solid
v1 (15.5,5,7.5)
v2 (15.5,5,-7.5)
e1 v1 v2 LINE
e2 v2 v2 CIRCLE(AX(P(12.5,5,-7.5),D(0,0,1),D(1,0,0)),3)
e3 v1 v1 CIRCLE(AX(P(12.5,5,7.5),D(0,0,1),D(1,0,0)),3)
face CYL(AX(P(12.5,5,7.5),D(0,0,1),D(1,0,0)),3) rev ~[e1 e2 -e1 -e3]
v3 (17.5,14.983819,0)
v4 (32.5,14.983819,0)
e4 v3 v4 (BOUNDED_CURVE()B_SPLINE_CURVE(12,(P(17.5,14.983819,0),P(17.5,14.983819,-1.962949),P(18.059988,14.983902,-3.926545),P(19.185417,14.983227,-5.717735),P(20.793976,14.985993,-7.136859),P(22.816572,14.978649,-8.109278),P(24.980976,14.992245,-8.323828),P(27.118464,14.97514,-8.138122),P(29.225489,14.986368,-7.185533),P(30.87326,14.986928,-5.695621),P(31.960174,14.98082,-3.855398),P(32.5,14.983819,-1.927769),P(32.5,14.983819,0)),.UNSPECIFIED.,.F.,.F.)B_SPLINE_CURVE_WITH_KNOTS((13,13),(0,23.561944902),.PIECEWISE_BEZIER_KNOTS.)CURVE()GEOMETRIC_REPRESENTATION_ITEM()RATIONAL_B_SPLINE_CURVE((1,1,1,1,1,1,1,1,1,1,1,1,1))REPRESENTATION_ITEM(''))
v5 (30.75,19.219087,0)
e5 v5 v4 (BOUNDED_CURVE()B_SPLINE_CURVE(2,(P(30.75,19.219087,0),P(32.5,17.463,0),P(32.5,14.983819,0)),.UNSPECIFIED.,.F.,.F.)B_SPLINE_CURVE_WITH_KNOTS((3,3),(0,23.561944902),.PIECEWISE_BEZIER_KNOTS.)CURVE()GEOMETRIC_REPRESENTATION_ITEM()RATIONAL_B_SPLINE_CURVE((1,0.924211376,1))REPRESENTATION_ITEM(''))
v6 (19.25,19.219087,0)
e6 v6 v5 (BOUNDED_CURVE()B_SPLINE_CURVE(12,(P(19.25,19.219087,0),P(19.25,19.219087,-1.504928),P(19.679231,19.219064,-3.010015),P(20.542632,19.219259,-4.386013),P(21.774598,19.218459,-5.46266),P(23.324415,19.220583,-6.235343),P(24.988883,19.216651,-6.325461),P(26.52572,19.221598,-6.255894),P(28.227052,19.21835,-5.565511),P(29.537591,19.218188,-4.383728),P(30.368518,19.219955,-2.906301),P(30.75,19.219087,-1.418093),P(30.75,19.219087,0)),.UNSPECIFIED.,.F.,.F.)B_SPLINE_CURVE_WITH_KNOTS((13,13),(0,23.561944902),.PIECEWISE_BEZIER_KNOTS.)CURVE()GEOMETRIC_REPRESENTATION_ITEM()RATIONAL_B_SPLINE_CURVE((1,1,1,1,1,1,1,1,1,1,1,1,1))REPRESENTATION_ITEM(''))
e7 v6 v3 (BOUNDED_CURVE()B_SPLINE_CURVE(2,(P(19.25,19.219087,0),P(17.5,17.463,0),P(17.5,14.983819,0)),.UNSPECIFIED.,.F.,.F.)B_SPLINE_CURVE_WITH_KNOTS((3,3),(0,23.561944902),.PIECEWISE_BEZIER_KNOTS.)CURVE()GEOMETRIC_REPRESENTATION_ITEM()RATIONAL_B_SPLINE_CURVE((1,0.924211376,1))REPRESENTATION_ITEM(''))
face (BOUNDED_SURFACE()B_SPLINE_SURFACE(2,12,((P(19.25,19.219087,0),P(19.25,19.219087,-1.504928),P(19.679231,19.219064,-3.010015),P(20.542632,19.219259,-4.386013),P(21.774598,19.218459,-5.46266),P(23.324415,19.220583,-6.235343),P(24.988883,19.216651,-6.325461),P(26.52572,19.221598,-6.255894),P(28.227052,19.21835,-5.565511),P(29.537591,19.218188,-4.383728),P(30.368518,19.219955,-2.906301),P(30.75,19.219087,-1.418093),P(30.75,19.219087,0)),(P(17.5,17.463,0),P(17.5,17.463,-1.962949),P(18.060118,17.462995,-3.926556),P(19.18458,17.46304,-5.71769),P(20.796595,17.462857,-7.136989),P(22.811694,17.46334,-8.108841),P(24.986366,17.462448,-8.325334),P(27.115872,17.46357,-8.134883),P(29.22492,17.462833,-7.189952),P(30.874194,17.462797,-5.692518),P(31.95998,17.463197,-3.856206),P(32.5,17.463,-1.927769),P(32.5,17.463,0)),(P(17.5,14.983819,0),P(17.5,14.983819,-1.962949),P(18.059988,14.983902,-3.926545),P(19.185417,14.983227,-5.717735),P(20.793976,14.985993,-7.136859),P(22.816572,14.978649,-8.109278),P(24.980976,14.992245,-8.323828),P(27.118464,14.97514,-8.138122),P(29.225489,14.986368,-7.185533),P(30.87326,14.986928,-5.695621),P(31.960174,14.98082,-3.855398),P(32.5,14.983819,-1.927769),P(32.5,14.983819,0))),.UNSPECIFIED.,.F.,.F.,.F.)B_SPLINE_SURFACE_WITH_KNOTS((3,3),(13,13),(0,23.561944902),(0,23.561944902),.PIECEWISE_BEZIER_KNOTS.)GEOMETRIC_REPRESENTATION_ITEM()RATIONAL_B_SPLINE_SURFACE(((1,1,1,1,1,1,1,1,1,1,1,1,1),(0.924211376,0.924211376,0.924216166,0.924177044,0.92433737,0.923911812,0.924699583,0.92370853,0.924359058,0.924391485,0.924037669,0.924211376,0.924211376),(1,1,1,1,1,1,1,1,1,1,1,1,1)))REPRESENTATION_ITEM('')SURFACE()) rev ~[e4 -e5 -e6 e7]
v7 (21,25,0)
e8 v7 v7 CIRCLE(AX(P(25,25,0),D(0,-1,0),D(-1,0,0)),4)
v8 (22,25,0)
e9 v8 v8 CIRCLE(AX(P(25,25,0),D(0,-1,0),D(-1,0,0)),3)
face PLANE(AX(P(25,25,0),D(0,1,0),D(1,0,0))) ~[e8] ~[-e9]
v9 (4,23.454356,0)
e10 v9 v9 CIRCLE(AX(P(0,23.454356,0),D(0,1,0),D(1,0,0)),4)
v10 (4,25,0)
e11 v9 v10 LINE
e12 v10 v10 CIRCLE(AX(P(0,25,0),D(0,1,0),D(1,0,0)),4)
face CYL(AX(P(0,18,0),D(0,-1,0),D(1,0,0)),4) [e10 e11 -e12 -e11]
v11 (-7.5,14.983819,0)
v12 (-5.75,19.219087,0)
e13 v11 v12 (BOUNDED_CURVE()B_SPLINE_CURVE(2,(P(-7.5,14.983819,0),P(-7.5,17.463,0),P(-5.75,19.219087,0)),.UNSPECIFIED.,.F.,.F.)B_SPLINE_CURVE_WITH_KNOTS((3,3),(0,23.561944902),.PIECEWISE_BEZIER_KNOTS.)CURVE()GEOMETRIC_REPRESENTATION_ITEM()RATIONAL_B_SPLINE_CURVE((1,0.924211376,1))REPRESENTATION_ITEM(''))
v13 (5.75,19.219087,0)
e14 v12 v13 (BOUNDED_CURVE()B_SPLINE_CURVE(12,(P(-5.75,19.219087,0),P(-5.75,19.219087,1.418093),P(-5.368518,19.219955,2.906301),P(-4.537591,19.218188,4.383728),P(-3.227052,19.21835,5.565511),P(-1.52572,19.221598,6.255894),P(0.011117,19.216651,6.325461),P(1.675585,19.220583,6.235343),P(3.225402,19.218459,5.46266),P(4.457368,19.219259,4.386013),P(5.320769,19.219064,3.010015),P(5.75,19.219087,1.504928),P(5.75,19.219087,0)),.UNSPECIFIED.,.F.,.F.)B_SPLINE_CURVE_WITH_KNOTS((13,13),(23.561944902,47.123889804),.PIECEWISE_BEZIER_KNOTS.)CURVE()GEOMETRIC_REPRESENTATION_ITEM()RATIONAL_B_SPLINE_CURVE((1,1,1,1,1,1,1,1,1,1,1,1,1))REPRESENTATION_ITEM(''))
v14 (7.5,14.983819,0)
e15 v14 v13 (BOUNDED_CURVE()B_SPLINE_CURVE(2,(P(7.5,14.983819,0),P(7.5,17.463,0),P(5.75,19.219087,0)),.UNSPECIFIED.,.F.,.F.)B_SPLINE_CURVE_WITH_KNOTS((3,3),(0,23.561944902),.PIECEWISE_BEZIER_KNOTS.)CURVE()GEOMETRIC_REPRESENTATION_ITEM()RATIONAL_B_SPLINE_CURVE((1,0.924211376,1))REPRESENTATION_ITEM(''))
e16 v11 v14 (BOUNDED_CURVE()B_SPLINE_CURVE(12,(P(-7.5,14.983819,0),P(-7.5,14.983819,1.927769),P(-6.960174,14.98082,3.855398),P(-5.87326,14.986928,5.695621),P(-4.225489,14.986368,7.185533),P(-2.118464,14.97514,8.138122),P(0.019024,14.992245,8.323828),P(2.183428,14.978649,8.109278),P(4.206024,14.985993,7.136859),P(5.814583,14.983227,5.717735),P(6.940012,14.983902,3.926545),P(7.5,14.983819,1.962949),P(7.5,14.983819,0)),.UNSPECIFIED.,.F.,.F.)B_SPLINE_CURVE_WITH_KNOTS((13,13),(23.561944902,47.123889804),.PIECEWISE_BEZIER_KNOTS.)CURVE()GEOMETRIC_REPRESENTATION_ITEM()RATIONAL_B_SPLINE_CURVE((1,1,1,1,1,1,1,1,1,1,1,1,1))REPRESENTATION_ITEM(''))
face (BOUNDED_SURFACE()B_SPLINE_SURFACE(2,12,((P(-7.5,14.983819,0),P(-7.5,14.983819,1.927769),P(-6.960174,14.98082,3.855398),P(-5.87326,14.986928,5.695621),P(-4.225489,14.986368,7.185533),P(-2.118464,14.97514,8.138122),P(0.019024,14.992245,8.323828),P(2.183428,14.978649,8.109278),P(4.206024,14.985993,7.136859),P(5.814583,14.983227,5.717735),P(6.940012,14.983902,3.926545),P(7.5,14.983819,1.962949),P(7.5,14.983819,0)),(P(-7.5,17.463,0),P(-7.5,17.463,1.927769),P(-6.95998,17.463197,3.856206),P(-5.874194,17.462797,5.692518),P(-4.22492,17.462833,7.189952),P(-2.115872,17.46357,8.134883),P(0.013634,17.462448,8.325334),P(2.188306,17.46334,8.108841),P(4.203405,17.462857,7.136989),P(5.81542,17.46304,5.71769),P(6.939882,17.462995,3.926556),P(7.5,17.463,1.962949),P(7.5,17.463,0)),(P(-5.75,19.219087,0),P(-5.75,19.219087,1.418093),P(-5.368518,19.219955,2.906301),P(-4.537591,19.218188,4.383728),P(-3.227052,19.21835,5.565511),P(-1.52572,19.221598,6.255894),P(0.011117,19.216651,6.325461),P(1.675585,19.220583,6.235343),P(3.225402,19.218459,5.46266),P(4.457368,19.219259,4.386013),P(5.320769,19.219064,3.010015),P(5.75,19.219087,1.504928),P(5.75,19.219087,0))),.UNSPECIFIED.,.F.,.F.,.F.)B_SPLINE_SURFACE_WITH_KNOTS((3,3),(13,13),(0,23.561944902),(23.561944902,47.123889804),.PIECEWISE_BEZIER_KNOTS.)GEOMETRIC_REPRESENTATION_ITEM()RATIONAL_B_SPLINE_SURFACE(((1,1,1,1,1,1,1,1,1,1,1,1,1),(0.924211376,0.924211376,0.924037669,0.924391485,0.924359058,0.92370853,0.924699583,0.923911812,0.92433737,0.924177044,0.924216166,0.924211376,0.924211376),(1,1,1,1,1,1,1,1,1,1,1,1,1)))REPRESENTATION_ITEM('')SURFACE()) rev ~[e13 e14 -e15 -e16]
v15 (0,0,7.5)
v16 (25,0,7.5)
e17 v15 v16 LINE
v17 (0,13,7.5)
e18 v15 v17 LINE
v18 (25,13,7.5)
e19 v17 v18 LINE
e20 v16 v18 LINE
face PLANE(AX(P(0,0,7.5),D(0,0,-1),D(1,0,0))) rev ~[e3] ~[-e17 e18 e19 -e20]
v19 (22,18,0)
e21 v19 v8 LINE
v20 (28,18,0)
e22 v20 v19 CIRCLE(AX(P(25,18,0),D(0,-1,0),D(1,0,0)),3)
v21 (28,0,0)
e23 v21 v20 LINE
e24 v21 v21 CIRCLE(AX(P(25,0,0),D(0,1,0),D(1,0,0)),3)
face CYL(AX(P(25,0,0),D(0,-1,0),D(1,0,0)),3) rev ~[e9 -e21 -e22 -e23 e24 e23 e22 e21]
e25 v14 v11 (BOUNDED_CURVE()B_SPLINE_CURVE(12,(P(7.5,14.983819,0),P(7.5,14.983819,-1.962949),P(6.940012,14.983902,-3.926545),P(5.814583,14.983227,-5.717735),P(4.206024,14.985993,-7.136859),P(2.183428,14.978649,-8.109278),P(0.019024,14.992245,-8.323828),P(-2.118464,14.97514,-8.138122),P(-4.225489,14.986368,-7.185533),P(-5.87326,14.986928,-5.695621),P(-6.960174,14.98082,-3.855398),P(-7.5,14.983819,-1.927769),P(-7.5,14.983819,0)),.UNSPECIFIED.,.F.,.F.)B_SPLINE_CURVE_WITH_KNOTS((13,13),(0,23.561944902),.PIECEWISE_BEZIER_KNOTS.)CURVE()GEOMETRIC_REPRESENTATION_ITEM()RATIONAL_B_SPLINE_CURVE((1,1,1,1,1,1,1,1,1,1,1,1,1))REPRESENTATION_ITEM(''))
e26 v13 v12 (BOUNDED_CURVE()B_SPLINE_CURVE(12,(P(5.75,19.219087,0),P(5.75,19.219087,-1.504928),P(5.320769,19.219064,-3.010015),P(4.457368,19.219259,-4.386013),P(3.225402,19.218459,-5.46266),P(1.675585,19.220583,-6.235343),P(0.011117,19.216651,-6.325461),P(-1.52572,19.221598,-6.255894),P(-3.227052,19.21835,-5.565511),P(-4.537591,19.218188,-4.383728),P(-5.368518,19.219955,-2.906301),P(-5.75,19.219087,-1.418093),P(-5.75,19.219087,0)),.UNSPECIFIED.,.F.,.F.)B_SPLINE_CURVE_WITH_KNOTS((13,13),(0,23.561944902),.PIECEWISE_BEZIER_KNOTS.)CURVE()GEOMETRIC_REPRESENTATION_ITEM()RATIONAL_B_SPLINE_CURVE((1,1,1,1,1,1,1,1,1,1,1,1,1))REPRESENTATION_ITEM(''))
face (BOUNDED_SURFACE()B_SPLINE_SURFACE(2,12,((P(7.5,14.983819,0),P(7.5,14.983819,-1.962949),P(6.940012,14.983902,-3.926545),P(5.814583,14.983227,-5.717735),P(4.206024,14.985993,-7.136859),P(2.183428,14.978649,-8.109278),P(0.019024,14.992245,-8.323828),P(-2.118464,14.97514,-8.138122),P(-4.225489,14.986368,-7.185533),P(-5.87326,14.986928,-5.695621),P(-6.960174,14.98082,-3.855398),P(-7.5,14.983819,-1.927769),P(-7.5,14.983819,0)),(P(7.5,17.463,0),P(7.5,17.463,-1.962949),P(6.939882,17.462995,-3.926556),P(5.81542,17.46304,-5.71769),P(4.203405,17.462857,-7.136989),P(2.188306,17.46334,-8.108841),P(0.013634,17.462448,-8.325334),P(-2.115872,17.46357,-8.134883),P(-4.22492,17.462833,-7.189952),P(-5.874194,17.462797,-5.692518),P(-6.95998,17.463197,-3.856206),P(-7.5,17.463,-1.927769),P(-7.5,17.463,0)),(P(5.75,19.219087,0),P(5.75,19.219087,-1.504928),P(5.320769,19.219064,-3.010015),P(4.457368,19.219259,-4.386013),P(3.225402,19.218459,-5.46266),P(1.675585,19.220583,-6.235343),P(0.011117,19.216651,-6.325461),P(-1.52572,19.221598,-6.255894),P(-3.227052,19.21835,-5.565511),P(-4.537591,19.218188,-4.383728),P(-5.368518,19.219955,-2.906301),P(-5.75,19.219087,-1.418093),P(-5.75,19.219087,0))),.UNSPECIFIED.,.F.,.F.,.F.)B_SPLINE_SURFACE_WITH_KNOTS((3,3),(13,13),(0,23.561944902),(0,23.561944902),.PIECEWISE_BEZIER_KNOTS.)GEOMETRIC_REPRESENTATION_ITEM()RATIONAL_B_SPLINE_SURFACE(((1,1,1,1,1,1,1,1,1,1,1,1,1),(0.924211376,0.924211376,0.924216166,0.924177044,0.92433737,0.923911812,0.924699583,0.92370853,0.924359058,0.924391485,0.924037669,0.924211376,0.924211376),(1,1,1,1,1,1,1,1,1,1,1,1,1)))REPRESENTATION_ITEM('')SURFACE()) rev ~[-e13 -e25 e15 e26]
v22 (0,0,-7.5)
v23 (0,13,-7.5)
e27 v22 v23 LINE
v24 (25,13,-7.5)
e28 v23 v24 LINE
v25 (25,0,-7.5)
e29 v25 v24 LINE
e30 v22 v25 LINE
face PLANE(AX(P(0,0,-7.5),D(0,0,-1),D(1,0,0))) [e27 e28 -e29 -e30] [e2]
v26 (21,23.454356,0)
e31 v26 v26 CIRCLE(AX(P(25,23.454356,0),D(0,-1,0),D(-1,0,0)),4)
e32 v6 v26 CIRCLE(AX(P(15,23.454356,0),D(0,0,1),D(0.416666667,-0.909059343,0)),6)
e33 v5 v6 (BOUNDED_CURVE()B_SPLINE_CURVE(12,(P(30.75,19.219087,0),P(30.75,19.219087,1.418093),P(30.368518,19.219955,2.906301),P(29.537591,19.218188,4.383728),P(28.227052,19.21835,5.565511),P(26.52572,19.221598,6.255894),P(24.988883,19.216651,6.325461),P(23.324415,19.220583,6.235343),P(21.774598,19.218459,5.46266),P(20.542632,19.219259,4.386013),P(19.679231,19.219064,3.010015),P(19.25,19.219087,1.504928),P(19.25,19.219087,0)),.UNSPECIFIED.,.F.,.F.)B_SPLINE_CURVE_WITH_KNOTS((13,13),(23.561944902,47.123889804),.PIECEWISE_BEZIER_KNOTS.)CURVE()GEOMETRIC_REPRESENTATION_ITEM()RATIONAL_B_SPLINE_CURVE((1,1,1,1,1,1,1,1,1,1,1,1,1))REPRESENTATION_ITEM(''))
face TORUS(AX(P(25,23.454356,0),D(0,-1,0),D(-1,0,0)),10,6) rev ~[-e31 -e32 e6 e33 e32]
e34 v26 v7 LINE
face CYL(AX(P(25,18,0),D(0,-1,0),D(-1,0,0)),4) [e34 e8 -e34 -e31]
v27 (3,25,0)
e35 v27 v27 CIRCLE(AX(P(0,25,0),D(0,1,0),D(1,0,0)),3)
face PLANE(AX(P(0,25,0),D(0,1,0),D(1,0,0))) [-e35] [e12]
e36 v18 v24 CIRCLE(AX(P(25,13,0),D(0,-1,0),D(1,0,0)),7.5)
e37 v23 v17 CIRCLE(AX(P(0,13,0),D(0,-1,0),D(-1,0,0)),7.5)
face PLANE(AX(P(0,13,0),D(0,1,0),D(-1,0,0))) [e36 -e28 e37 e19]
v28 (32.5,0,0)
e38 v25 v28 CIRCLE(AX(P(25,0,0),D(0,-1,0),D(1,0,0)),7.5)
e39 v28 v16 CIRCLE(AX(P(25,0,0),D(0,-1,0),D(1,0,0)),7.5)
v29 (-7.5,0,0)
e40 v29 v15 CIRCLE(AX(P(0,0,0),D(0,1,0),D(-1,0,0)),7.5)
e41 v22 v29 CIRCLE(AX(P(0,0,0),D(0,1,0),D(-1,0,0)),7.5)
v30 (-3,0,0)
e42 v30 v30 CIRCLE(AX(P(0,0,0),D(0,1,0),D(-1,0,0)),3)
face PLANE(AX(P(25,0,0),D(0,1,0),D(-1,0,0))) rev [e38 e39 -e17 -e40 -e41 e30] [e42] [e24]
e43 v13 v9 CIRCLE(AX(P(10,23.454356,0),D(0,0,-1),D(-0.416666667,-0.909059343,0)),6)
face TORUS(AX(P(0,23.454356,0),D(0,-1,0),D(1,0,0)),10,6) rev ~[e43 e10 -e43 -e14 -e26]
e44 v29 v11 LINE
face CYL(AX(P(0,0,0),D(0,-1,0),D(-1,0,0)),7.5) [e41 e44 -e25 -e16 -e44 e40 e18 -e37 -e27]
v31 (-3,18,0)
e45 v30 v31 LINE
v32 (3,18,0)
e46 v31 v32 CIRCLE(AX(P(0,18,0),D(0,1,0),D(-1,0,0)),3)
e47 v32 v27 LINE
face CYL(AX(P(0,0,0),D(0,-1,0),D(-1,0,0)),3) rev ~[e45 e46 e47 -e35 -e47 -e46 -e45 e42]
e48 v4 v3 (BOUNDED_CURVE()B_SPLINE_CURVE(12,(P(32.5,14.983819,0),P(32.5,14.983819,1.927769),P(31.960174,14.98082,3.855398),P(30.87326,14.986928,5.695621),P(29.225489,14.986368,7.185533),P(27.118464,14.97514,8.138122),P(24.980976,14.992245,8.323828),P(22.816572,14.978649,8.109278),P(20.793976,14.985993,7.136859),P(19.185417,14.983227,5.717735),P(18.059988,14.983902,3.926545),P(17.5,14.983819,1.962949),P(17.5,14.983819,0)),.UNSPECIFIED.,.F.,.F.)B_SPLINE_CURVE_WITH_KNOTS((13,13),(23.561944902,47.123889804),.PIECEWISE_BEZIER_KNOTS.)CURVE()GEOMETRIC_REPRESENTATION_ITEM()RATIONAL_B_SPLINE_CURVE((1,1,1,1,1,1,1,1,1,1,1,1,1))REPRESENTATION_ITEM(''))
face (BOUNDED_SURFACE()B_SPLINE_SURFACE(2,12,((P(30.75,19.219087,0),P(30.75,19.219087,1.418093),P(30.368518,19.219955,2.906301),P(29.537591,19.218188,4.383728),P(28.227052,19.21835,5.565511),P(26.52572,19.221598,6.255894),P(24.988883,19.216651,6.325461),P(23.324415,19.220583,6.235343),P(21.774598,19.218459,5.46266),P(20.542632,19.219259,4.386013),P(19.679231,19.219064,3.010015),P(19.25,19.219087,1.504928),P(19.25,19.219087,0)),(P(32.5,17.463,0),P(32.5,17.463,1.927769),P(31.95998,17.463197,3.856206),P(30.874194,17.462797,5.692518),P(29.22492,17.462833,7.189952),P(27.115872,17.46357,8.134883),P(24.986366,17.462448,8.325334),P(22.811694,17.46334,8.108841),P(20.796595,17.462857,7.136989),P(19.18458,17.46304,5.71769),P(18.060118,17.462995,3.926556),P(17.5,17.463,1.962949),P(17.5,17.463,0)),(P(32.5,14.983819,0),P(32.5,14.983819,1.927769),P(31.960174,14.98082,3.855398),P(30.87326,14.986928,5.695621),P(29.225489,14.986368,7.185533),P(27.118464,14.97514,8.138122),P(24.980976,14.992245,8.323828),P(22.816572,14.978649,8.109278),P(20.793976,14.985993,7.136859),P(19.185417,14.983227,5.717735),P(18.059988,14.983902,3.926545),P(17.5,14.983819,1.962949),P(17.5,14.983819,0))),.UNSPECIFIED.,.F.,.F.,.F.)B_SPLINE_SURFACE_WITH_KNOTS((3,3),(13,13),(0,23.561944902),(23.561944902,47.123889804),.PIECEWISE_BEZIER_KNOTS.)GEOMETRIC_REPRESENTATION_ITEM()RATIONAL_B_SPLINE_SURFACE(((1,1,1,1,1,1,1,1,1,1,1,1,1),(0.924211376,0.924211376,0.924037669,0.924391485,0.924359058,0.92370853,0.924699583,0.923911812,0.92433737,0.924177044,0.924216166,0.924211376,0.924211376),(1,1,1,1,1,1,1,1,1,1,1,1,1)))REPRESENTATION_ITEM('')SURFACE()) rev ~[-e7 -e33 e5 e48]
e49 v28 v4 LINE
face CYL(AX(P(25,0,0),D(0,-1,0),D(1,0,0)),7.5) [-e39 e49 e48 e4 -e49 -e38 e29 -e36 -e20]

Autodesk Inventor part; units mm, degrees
ref_plane "XZ Plane" through (0, 0, 0) normal (0, 1, 0) x (-1, 0, 0)
ref_plane "XY Plane" through (0, 0, 0) normal (0, 0, 1) x (1, 0, 0)
sketch "Sketch1" plane through (0, 0, 0) normal (0, 1, 0) x (-1, 0, 0)
  circle A0 centre (0, 0) radius 7.5
  circle A1 centre (0, 0) radius 3
  dimension "d0" = 15
  dimension "d1" = 6
extrude "Extrusion1" add sketch "Sketch1" along normal blind 18
sketch "Sketch2" plane through (0, 18, 0) normal (0, 1, 0) x (1, 0, 0)
  circle A0 centre (0, 0) radius 3 projected
  circle A1 centre (0, 0) radius 2.75
  circle A2 centre (0, 0) radius 4
  dimension "d4" = 5.5
  dimension "d5" = 8
extrude "Extrusion2" add sketch "Sketch2" along normal blind 7 contours A2
fillet "Fillet1" radius 6 1 edges at (-4, 18, 0)
fillet "Fillet2" radius 6 2 edges at (0, 18, -7.5) (0, 18, 7.5)
ref_plane "Work Plane1" through (12.5, 0, 0) normal (1, 0, 0) x (0, 1, 0)
mirror "Mirror1" about plane through (12.5, 0, 0) normal (1, 0, 0) of "Extrusion1", "Extrusion2", "Fillet1", "Fillet2"
sketch "Sketch3" plane through (0, 0, 0) normal (0, 1, 0) x (-1, 0, 0)
  circle A0 centre (-25, 0) radius 3 projected
  line L0 (-25, 0) -> (-25, 3)
  line L1 (-25, 0) -> (-25, -3)
  line L2 (0, 0) -> (0, -3)
  circle A1 centre (0, 0) radius 3 projected
  line L3 (0, 0) -> (0, 3)
  line L4 (-25, 3) -> (0, 3)
  line L5 (0, 3) -> (0, 7.5)
  line L6 (0, 7.5) -> (-25, 7.5)
  line L7 (-25, 7.5) -> (-25, 3)
  line L8 (-25, -3) -> (0, -3)
  line L9 (0, -3) -> (0, -7.5)
  line L10 (0, -7.5) -> (-25, -7.5)
  line L11 (-25, -7.5) -> (-25, -3)
  point P0 (0, -3)
  point P1 (0, 3)
  dimension "d11" = 25
  dimension "d12" = 4.5
  dimension "d13" = 25
  dimension "d14" = 4.5
extrude "Extrusion3" add sketch "Sketch3" along normal blind 13 contours A0 L4 A1 L8 | L7 L6 L5 L4 | L8 L9 L10 L11
sketch "Sketch4" plane through (0, 0, 7.5) normal (0, 0, 1) x (1, 0, 0)
  line L0 (25, 13) -> (0, 13) projected
  circle A0 centre (12.5, 5) radius 3
  line L1 (0, 0) -> (25, 0) projected
  line L2 (0, 0) -> (0, 13) projected
  point P0 (25, 15)
  point P1 (0, 15)
  dimension "d18" = 6
  dimension "d21" = 5
  dimension "d22" = 12.5
extrude "Extrusion4" cut sketch "Sketch4" against normal through all
properties part number "4mm_Roller_Spacer_extended"
